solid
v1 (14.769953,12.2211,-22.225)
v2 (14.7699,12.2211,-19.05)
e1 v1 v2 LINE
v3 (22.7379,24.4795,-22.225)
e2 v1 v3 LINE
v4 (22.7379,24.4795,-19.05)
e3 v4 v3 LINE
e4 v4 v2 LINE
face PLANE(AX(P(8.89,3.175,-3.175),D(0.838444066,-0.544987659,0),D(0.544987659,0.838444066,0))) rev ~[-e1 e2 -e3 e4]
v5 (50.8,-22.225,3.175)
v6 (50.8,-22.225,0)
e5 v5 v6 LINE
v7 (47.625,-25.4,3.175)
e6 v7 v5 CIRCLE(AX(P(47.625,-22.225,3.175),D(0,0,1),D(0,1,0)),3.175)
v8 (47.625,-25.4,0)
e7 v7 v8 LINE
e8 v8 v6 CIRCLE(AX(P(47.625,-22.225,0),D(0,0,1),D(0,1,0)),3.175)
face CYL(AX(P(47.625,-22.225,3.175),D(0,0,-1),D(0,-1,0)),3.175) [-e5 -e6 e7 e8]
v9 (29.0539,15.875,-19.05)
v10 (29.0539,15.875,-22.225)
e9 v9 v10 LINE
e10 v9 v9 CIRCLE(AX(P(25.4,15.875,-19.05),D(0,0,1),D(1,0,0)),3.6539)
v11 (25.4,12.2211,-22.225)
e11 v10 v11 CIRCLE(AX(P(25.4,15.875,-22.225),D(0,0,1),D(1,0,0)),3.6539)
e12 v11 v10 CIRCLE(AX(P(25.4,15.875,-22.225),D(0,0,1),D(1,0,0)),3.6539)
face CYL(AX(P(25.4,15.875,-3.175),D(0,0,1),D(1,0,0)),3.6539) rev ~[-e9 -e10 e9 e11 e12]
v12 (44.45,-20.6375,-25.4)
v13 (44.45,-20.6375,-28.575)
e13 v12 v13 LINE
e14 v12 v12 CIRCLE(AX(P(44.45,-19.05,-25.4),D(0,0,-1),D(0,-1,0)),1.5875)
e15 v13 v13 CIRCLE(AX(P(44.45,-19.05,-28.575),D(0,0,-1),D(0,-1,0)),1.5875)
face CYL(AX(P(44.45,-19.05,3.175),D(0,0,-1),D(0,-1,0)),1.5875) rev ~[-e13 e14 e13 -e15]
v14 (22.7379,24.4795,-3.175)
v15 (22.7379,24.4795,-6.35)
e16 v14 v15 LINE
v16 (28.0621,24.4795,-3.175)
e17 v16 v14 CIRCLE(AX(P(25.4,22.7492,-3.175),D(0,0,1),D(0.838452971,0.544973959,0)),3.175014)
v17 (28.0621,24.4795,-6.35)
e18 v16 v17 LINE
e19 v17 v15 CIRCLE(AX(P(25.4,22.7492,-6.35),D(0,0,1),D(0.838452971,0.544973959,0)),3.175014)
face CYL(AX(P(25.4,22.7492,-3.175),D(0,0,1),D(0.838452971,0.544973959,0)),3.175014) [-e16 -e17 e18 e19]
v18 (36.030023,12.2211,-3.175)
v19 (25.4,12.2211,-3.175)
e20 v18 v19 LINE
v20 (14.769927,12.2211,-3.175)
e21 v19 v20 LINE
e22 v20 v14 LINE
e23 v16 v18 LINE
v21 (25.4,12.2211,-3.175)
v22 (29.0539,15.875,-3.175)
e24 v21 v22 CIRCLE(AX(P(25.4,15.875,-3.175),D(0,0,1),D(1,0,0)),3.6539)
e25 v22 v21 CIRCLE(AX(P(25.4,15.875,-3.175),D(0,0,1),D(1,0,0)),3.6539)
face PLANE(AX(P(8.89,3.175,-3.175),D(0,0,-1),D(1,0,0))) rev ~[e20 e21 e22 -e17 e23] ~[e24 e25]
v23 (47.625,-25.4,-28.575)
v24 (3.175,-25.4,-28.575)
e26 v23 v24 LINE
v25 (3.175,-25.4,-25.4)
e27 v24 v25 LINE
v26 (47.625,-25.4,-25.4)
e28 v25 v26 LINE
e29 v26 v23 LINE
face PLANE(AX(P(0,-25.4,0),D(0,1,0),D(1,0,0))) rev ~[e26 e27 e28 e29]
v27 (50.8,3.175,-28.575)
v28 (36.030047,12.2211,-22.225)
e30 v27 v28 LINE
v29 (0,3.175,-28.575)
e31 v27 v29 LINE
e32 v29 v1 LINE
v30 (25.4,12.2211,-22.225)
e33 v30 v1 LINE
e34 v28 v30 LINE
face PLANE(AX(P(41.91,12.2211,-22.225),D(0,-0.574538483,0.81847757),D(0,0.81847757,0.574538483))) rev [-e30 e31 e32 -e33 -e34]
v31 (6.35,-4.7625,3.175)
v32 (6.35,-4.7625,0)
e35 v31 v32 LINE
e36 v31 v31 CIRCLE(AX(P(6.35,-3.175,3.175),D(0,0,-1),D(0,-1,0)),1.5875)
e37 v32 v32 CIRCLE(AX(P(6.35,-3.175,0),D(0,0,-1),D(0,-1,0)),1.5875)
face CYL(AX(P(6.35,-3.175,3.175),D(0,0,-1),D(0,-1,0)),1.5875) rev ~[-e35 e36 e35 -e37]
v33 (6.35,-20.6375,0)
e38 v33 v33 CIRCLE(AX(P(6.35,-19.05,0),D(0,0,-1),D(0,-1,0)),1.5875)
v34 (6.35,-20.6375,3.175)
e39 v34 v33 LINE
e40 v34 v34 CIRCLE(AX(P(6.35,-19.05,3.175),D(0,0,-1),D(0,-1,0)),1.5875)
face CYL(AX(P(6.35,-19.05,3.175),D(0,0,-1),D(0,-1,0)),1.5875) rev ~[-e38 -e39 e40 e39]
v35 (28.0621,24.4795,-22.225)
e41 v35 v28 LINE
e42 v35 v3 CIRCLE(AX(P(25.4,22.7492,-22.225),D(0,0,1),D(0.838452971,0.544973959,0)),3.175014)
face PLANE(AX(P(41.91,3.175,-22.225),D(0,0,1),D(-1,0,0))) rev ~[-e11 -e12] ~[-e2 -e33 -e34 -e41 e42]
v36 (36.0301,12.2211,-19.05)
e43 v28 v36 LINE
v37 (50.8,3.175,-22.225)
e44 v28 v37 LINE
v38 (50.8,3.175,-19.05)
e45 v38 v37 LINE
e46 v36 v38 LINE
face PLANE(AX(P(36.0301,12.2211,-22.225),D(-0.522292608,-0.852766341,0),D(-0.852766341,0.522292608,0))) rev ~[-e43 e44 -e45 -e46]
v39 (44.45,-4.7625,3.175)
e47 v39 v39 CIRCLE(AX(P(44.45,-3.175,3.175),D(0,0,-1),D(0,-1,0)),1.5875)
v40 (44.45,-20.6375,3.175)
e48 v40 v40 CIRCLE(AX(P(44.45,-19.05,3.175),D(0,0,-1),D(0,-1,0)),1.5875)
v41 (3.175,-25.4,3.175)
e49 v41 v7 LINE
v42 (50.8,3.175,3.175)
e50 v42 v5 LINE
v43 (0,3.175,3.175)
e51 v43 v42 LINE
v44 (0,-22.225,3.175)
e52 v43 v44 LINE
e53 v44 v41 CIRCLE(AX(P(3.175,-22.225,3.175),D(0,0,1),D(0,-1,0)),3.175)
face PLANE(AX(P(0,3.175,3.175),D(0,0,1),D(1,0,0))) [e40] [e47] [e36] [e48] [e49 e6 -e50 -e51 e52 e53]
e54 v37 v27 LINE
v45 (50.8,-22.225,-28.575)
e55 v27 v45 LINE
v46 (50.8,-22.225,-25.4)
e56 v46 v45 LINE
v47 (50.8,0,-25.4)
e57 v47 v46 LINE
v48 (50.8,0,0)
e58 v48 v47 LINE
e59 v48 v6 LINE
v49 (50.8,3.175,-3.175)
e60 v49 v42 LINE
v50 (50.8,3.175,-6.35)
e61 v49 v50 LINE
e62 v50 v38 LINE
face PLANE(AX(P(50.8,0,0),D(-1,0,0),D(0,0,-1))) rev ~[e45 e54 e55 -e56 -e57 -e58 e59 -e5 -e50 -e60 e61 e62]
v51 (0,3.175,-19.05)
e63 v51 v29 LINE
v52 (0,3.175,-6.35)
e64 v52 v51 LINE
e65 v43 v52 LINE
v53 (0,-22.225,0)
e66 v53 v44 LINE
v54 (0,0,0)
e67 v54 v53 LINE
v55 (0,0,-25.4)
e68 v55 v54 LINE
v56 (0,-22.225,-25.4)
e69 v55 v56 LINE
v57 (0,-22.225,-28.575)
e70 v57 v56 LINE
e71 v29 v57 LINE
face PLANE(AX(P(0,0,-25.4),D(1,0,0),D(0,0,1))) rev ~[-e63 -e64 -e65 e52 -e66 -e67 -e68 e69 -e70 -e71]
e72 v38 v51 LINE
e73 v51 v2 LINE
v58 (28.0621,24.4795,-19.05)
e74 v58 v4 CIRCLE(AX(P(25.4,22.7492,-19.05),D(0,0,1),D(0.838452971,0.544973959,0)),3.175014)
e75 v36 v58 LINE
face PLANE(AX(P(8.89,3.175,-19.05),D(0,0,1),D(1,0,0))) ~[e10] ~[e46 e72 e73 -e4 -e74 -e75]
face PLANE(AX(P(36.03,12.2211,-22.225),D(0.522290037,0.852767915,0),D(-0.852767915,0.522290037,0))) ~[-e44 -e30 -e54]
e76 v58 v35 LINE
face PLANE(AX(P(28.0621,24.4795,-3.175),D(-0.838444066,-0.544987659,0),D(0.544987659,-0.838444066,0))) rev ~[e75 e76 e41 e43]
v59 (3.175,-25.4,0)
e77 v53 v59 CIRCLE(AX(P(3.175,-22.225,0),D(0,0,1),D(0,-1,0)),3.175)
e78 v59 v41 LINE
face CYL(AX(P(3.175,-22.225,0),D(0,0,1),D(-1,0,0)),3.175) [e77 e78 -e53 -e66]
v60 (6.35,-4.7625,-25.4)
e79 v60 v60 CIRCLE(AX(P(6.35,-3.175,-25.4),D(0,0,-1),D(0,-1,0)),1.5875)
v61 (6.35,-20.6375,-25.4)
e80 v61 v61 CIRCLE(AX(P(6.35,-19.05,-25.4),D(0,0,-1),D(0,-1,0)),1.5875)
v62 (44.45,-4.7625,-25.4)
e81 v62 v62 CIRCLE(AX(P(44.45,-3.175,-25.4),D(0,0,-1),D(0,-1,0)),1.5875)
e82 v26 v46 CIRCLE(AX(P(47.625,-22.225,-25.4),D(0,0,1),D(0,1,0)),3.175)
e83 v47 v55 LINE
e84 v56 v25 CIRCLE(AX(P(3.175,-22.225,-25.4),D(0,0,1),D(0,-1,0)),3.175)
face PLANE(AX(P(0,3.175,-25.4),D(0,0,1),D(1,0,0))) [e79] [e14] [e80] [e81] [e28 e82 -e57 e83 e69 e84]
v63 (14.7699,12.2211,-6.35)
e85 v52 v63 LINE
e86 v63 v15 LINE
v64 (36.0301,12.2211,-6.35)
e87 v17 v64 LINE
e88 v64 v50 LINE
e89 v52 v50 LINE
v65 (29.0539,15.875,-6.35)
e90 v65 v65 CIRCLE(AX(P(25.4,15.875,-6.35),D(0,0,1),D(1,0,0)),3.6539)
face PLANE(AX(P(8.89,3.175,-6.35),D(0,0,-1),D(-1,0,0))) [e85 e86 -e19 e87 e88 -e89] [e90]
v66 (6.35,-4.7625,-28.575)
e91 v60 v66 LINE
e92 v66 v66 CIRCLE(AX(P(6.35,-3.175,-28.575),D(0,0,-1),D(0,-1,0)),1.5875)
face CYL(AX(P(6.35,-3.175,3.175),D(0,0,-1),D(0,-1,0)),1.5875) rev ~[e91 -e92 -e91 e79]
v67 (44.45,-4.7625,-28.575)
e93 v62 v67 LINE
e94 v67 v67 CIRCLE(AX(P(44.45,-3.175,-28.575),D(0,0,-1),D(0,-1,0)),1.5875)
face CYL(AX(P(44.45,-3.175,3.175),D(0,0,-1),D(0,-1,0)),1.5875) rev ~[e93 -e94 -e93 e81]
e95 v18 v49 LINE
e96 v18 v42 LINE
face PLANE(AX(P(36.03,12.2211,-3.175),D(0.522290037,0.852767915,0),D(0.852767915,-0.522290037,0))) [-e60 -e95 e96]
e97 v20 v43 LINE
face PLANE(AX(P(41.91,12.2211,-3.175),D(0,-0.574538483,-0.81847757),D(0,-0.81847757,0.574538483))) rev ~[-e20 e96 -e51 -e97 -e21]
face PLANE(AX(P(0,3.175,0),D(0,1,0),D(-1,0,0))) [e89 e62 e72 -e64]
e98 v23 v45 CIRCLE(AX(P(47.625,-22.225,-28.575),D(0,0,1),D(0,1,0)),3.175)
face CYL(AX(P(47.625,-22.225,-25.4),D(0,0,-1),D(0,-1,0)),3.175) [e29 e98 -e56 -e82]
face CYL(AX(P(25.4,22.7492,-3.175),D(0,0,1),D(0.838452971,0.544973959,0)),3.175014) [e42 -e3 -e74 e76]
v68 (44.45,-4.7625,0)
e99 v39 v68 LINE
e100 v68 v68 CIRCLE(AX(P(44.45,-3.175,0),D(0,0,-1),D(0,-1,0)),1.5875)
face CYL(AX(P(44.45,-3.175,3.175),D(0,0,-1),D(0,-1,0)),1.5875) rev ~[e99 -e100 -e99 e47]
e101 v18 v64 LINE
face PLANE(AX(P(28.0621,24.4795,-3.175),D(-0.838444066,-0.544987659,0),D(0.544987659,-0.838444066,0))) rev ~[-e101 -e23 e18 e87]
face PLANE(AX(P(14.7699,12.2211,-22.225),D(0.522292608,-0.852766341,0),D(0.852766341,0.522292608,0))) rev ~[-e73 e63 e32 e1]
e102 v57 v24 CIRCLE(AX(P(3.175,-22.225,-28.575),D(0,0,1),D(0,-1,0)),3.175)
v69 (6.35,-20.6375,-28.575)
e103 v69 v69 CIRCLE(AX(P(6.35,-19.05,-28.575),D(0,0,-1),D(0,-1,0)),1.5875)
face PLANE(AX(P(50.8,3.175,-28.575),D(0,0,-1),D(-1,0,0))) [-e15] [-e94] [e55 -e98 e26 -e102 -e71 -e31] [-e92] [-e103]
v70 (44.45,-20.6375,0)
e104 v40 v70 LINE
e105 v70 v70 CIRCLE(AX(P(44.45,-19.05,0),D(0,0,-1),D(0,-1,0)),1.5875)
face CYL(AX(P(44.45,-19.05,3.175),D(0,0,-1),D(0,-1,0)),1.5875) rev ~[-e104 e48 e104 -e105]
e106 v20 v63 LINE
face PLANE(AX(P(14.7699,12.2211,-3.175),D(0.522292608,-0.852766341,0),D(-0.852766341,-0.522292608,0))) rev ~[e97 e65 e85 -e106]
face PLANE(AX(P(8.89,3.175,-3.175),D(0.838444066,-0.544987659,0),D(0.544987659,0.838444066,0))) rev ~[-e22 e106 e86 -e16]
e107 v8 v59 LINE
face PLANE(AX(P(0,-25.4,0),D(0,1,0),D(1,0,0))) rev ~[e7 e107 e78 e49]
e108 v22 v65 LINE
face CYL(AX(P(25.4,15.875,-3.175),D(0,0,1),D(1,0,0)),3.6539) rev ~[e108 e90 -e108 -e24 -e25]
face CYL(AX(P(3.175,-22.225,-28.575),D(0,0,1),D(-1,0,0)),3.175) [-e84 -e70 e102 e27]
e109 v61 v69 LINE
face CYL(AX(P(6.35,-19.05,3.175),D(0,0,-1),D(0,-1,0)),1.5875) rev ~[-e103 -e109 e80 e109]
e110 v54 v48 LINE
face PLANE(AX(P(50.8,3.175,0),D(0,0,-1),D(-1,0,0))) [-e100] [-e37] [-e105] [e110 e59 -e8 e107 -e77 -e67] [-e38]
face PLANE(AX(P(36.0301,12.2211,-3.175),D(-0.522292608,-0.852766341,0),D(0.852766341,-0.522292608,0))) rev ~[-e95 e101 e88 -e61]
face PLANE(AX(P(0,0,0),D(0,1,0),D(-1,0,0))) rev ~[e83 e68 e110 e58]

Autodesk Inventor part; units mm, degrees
ref_plane "YZ Plane" through (0, 0, 0) normal (1, 0, 0) x (0, 1, 0)
ref_plane "XZ Plane" through (0, 0, 0) normal (0, 1, 0) x (-1, 0, 0)
ref_plane "XY Plane" through (0, 0, 0) normal (0, 0, 1) x (1, 0, 0)
sketch "Sketch1" plane through (0, 0, 0) normal (0, 1, 0) x (-1, 0, 0)
  line L0 (0, 0) -> (-50.8, 0)
  line L1 (-50.8, 0) -> (-50.8, -25.4)
  line L2 (-50.8, -25.4) -> (0, -25.4)
  line L3 (0, -25.4) -> (0, 0)
  dimension "d0" = 50.8
  dimension "d1" = 25.4
extrude "Extrusion1" add sketch "Sketch1" along normal blind 3.175
sketch "Sketch2" plane through (0, 3.175, 0) normal (0, 1, 0) x (1, 0, 0)
  line L0 (8.89, 3.175) -> (41.91, 3.175)
  line L1 (41.91, 3.175) -> (41.91, 6.35)
  line L2 (41.91, 6.35) -> (8.89, 6.35)
  line L3 (8.89, 6.35) -> (8.89, 3.175)
  line L4 (8.89, 19.05) -> (41.91, 19.05)
  line L5 (41.91, 19.05) -> (41.91, 22.225)
  line L6 (41.91, 22.225) -> (8.89, 22.225)
  line L7 (8.89, 22.225) -> (8.89, 19.05)
  line L8 (0, 25.4) -> (0, 0) projected
  line L9 (50.8, 0) -> (50.8, 25.4) projected
  line L10 (50.8, 25.4) -> (0, 25.4) projected
  point P0 (41.91, 20.6375)
  point P1 (41.91, 4.7625)
  point P2 (8.89, 20.6375)
  point P3 (8.89, 4.7625)
  dimension "d4" = 8.89
  dimension "d5" = 8.89
  dimension "d6" = 3.175
  dimension "d7" = 12.7
  dimension "d8" = 3.175
extrude "Extrusion2" add sketch "Sketch2" along normal blind 38.1
sketch "Sketch3" plane through (8.89, 3.175, -3.175) normal (0, 0, 1) x (1, 0, 0)
  line L0 (0, 0) -> (0, 38.1) projected
  line L1 (0, 0) -> (13.8479, 21.3045)
  line L2 (19.1721, 21.3045) -> (33.02, 0)
  line L3 (33.02, 0) -> (33.02, 38.1) projected
  line L4 (-8.89, 0) -> (41.91, 0) projected
  arc A0 (19.1721, 21.3045) -> (13.8479, 21.3045) centre (16.51, 19.5742) ccw
  line L5 (33.02, 38.1) -> (0, 38.1) projected
  line L6 (0, 38.1) -> (33.02, 38.1)
  point P0 (-8.89, -3.175)
  point P1 (16.51, 25.4)
  dimension "d11" = 25.4
  dimension "d12" = 3.175
extrude "Extrusion3" cut sketch "Sketch3" against normal blind 38.1 contours L0 L5 L3 L2 A0 L1
sketch "Sketch4" plane through (8.89, 3.175, -3.175) normal (0, 0, 1) x (1, 0, 0)
  circle A0 centre (16.51, 12.7) radius 3.6539
  line L0 (-8.89, 0) -> (41.91, 0) projected
  point P0 (-8.89, -3.175)
  point P1 (16.51, 0)
  dimension "d15" = 12.7
extrude "Extrusion4" cut sketch "Sketch4" against normal blind 38.1
sketch "Sketch6" plane through (0, 3.175, 0) normal (0, 1, 0) x (1, 0, 0)
  line L0 (50.8, 0) -> (0, 0)
  line L1 (0, 0) -> (0, -3.175)
  line L2 (0, -3.175) -> (50.8, -3.175)
  line L3 (50.8, -3.175) -> (50.8, 0)
  line L4 (50.8, 28.575) -> (0, 28.575)
  line L5 (0, 28.575) -> (0, 25.4)
  line L6 (0, 25.4) -> (50.8, 25.4)
  line L7 (50.8, 25.4) -> (50.8, 28.575)
  line L8 (50.8, 0) -> (50.8, 25.4) projected
  line L9 (0, 25.4) -> (0, 0) projected
  point P0 (50.8, -1.5875)
  point P1 (50.8, 26.9875)
  point P2 (0, -1.5875)
  point P3 (0, 26.9875)
  point P4 (25.4, 0)
  point P5 (0, 12.7)
  dimension "d26" = 0
  dimension "d27" = 3.175
extrude "Extrusion5" add sketch "Sketch6" against normal blind 28.575 contours L3 L2 L1 L0 | L6 L5 L4 L7
sketch "Sketch7" plane through (0, 3.175, 3.175) normal (0, 0, 1) x (1, 0, 0)
  line L0 (0, 0) -> (50.8, 0) construction
  line L1 (0, 0) -> (0, -28.575) construction
  line L2 (50.8, -28.575) -> (0, -28.575) construction
  line L3 (50.8, 0) -> (50.8, -28.575) construction
  line L4 (44.45, -22.225) -> (6.35, -22.225) construction
  line L5 (6.35, -22.225) -> (6.35, -6.35) construction
  line L6 (6.35, -6.35) -> (44.45, -6.35) construction
  line L7 (44.45, -6.35) -> (44.45, -22.225) construction
  point P0 (0, -3.175)
  dimension "d30" = 6.35
hole "Hole2" at (6.35, -3.175, 3.175) at (44.45, -3.175, 3.175) at (44.45, -19.05, 3.175) at (6.35, -19.05, 3.175) direction (0, 0, -1) diameter 3.175 end through all
fillet "Fillet1" radius 3.175 4 edges at (0, -25.4, 1.5875) (0, -25.4, -26.9875) (50.8, -25.4, 1.5875) (50.8, -25.4, -26.9875)
ref_plane "Work Plane1" through (8.89, 3.175, -12.7) normal (0, 0, 1) x (1, 0, 0)
ref_plane "Work Plane2" through (41.91, 3.175, -3.175) normal (1, 0, 0) x (0, 0, -1)
sketch "Sketch8" plane through (41.91, 3.175, -3.175) normal (1, 0, 0) x (0, 0, -1)
  line L0 (0, 0) -> (0, 9.0461)
  line L1 (-6.35, 0) -> (-6.35, -25.4) projected
  line L2 (0, 9.0461) -> (-6.35, 0)
  line L3 (-6.35, 0) -> (0, 0)
  line L4 (0, 9.0461) -> (0, 16.3539) projected
  point P0 (-3.175, -3.175)
extrude "Extrusion6" add sketch "Sketch8" along normal blind 8.89 and the other way blind 41.91
sketch "Sketch10" plane through (14.7699, 12.2211, -3.175) normal (0, 0, -1) x (-1, 0, 0)
  line L0 (-27.1401, -9.0461) -> (-21.2601, 0) projected
  line L1 (-21.2601, 0) -> (-36.0301, -9.0461)
  line L2 (-36.0301, 0) -> (-36.0301, -9.0461) projected
  line L3 (-21.2601, 0) -> (-36.0301, 0)
  line L4 (-36.0301, -9.0461) -> (-36.0301, 0) projected
  line L5 (-36.0301, 0) -> (-36.0301, -9.0461)
  line L6 (0, 0) -> (5.8799, -9.0461) projected
  line L7 (0, 0) -> (14.7699, -9.0461)
  line L8 (14.7699, -9.0461) -> (14.7699, 0) projected
  line L9 (14.7699, -9.0461) -> (14.7699, 0)
  line L10 (14.7699, 0) -> (0, 0)
  point P0 (14.7699, -12.2211)
extrude "Extrusion8" cut sketch "Sketch10" against normal blind 8.89
mirror "Mirror2" about plane through (8.89, 3.175, -12.7) normal (0, 0, 1) of "Extrusion6", "Extrusion8"
sketch "Sketch11" plane through (8.89, 3.175, -3.175) normal (0, 0, -1) x (-1, 0, 0)
  line L0 (8.89, 0) -> (-5.8799, 9.0461) projected
  line L1 (-5.8799, 9.0461) -> (0, 0) projected
  line L2 (8.89, 0) -> (0, 0) projected
  line L3 (-27.1401, 9.0461) -> (-41.91, 0) projected
  line L4 (-33.02, 0) -> (-41.91, 0) projected
  line L5 (-33.02, 0) -> (-27.1401, 9.0461) projected
  point P0 (8.89, -3.175)
extrude "Extrusion9" add sketch "Sketch11" along normal blind 3.175
mirror "Mirror3" about plane through (8.89, 3.175, -12.7) normal (0, 0, 1) of "Extrusion9"
properties part number "Intake - Piston Mount"
